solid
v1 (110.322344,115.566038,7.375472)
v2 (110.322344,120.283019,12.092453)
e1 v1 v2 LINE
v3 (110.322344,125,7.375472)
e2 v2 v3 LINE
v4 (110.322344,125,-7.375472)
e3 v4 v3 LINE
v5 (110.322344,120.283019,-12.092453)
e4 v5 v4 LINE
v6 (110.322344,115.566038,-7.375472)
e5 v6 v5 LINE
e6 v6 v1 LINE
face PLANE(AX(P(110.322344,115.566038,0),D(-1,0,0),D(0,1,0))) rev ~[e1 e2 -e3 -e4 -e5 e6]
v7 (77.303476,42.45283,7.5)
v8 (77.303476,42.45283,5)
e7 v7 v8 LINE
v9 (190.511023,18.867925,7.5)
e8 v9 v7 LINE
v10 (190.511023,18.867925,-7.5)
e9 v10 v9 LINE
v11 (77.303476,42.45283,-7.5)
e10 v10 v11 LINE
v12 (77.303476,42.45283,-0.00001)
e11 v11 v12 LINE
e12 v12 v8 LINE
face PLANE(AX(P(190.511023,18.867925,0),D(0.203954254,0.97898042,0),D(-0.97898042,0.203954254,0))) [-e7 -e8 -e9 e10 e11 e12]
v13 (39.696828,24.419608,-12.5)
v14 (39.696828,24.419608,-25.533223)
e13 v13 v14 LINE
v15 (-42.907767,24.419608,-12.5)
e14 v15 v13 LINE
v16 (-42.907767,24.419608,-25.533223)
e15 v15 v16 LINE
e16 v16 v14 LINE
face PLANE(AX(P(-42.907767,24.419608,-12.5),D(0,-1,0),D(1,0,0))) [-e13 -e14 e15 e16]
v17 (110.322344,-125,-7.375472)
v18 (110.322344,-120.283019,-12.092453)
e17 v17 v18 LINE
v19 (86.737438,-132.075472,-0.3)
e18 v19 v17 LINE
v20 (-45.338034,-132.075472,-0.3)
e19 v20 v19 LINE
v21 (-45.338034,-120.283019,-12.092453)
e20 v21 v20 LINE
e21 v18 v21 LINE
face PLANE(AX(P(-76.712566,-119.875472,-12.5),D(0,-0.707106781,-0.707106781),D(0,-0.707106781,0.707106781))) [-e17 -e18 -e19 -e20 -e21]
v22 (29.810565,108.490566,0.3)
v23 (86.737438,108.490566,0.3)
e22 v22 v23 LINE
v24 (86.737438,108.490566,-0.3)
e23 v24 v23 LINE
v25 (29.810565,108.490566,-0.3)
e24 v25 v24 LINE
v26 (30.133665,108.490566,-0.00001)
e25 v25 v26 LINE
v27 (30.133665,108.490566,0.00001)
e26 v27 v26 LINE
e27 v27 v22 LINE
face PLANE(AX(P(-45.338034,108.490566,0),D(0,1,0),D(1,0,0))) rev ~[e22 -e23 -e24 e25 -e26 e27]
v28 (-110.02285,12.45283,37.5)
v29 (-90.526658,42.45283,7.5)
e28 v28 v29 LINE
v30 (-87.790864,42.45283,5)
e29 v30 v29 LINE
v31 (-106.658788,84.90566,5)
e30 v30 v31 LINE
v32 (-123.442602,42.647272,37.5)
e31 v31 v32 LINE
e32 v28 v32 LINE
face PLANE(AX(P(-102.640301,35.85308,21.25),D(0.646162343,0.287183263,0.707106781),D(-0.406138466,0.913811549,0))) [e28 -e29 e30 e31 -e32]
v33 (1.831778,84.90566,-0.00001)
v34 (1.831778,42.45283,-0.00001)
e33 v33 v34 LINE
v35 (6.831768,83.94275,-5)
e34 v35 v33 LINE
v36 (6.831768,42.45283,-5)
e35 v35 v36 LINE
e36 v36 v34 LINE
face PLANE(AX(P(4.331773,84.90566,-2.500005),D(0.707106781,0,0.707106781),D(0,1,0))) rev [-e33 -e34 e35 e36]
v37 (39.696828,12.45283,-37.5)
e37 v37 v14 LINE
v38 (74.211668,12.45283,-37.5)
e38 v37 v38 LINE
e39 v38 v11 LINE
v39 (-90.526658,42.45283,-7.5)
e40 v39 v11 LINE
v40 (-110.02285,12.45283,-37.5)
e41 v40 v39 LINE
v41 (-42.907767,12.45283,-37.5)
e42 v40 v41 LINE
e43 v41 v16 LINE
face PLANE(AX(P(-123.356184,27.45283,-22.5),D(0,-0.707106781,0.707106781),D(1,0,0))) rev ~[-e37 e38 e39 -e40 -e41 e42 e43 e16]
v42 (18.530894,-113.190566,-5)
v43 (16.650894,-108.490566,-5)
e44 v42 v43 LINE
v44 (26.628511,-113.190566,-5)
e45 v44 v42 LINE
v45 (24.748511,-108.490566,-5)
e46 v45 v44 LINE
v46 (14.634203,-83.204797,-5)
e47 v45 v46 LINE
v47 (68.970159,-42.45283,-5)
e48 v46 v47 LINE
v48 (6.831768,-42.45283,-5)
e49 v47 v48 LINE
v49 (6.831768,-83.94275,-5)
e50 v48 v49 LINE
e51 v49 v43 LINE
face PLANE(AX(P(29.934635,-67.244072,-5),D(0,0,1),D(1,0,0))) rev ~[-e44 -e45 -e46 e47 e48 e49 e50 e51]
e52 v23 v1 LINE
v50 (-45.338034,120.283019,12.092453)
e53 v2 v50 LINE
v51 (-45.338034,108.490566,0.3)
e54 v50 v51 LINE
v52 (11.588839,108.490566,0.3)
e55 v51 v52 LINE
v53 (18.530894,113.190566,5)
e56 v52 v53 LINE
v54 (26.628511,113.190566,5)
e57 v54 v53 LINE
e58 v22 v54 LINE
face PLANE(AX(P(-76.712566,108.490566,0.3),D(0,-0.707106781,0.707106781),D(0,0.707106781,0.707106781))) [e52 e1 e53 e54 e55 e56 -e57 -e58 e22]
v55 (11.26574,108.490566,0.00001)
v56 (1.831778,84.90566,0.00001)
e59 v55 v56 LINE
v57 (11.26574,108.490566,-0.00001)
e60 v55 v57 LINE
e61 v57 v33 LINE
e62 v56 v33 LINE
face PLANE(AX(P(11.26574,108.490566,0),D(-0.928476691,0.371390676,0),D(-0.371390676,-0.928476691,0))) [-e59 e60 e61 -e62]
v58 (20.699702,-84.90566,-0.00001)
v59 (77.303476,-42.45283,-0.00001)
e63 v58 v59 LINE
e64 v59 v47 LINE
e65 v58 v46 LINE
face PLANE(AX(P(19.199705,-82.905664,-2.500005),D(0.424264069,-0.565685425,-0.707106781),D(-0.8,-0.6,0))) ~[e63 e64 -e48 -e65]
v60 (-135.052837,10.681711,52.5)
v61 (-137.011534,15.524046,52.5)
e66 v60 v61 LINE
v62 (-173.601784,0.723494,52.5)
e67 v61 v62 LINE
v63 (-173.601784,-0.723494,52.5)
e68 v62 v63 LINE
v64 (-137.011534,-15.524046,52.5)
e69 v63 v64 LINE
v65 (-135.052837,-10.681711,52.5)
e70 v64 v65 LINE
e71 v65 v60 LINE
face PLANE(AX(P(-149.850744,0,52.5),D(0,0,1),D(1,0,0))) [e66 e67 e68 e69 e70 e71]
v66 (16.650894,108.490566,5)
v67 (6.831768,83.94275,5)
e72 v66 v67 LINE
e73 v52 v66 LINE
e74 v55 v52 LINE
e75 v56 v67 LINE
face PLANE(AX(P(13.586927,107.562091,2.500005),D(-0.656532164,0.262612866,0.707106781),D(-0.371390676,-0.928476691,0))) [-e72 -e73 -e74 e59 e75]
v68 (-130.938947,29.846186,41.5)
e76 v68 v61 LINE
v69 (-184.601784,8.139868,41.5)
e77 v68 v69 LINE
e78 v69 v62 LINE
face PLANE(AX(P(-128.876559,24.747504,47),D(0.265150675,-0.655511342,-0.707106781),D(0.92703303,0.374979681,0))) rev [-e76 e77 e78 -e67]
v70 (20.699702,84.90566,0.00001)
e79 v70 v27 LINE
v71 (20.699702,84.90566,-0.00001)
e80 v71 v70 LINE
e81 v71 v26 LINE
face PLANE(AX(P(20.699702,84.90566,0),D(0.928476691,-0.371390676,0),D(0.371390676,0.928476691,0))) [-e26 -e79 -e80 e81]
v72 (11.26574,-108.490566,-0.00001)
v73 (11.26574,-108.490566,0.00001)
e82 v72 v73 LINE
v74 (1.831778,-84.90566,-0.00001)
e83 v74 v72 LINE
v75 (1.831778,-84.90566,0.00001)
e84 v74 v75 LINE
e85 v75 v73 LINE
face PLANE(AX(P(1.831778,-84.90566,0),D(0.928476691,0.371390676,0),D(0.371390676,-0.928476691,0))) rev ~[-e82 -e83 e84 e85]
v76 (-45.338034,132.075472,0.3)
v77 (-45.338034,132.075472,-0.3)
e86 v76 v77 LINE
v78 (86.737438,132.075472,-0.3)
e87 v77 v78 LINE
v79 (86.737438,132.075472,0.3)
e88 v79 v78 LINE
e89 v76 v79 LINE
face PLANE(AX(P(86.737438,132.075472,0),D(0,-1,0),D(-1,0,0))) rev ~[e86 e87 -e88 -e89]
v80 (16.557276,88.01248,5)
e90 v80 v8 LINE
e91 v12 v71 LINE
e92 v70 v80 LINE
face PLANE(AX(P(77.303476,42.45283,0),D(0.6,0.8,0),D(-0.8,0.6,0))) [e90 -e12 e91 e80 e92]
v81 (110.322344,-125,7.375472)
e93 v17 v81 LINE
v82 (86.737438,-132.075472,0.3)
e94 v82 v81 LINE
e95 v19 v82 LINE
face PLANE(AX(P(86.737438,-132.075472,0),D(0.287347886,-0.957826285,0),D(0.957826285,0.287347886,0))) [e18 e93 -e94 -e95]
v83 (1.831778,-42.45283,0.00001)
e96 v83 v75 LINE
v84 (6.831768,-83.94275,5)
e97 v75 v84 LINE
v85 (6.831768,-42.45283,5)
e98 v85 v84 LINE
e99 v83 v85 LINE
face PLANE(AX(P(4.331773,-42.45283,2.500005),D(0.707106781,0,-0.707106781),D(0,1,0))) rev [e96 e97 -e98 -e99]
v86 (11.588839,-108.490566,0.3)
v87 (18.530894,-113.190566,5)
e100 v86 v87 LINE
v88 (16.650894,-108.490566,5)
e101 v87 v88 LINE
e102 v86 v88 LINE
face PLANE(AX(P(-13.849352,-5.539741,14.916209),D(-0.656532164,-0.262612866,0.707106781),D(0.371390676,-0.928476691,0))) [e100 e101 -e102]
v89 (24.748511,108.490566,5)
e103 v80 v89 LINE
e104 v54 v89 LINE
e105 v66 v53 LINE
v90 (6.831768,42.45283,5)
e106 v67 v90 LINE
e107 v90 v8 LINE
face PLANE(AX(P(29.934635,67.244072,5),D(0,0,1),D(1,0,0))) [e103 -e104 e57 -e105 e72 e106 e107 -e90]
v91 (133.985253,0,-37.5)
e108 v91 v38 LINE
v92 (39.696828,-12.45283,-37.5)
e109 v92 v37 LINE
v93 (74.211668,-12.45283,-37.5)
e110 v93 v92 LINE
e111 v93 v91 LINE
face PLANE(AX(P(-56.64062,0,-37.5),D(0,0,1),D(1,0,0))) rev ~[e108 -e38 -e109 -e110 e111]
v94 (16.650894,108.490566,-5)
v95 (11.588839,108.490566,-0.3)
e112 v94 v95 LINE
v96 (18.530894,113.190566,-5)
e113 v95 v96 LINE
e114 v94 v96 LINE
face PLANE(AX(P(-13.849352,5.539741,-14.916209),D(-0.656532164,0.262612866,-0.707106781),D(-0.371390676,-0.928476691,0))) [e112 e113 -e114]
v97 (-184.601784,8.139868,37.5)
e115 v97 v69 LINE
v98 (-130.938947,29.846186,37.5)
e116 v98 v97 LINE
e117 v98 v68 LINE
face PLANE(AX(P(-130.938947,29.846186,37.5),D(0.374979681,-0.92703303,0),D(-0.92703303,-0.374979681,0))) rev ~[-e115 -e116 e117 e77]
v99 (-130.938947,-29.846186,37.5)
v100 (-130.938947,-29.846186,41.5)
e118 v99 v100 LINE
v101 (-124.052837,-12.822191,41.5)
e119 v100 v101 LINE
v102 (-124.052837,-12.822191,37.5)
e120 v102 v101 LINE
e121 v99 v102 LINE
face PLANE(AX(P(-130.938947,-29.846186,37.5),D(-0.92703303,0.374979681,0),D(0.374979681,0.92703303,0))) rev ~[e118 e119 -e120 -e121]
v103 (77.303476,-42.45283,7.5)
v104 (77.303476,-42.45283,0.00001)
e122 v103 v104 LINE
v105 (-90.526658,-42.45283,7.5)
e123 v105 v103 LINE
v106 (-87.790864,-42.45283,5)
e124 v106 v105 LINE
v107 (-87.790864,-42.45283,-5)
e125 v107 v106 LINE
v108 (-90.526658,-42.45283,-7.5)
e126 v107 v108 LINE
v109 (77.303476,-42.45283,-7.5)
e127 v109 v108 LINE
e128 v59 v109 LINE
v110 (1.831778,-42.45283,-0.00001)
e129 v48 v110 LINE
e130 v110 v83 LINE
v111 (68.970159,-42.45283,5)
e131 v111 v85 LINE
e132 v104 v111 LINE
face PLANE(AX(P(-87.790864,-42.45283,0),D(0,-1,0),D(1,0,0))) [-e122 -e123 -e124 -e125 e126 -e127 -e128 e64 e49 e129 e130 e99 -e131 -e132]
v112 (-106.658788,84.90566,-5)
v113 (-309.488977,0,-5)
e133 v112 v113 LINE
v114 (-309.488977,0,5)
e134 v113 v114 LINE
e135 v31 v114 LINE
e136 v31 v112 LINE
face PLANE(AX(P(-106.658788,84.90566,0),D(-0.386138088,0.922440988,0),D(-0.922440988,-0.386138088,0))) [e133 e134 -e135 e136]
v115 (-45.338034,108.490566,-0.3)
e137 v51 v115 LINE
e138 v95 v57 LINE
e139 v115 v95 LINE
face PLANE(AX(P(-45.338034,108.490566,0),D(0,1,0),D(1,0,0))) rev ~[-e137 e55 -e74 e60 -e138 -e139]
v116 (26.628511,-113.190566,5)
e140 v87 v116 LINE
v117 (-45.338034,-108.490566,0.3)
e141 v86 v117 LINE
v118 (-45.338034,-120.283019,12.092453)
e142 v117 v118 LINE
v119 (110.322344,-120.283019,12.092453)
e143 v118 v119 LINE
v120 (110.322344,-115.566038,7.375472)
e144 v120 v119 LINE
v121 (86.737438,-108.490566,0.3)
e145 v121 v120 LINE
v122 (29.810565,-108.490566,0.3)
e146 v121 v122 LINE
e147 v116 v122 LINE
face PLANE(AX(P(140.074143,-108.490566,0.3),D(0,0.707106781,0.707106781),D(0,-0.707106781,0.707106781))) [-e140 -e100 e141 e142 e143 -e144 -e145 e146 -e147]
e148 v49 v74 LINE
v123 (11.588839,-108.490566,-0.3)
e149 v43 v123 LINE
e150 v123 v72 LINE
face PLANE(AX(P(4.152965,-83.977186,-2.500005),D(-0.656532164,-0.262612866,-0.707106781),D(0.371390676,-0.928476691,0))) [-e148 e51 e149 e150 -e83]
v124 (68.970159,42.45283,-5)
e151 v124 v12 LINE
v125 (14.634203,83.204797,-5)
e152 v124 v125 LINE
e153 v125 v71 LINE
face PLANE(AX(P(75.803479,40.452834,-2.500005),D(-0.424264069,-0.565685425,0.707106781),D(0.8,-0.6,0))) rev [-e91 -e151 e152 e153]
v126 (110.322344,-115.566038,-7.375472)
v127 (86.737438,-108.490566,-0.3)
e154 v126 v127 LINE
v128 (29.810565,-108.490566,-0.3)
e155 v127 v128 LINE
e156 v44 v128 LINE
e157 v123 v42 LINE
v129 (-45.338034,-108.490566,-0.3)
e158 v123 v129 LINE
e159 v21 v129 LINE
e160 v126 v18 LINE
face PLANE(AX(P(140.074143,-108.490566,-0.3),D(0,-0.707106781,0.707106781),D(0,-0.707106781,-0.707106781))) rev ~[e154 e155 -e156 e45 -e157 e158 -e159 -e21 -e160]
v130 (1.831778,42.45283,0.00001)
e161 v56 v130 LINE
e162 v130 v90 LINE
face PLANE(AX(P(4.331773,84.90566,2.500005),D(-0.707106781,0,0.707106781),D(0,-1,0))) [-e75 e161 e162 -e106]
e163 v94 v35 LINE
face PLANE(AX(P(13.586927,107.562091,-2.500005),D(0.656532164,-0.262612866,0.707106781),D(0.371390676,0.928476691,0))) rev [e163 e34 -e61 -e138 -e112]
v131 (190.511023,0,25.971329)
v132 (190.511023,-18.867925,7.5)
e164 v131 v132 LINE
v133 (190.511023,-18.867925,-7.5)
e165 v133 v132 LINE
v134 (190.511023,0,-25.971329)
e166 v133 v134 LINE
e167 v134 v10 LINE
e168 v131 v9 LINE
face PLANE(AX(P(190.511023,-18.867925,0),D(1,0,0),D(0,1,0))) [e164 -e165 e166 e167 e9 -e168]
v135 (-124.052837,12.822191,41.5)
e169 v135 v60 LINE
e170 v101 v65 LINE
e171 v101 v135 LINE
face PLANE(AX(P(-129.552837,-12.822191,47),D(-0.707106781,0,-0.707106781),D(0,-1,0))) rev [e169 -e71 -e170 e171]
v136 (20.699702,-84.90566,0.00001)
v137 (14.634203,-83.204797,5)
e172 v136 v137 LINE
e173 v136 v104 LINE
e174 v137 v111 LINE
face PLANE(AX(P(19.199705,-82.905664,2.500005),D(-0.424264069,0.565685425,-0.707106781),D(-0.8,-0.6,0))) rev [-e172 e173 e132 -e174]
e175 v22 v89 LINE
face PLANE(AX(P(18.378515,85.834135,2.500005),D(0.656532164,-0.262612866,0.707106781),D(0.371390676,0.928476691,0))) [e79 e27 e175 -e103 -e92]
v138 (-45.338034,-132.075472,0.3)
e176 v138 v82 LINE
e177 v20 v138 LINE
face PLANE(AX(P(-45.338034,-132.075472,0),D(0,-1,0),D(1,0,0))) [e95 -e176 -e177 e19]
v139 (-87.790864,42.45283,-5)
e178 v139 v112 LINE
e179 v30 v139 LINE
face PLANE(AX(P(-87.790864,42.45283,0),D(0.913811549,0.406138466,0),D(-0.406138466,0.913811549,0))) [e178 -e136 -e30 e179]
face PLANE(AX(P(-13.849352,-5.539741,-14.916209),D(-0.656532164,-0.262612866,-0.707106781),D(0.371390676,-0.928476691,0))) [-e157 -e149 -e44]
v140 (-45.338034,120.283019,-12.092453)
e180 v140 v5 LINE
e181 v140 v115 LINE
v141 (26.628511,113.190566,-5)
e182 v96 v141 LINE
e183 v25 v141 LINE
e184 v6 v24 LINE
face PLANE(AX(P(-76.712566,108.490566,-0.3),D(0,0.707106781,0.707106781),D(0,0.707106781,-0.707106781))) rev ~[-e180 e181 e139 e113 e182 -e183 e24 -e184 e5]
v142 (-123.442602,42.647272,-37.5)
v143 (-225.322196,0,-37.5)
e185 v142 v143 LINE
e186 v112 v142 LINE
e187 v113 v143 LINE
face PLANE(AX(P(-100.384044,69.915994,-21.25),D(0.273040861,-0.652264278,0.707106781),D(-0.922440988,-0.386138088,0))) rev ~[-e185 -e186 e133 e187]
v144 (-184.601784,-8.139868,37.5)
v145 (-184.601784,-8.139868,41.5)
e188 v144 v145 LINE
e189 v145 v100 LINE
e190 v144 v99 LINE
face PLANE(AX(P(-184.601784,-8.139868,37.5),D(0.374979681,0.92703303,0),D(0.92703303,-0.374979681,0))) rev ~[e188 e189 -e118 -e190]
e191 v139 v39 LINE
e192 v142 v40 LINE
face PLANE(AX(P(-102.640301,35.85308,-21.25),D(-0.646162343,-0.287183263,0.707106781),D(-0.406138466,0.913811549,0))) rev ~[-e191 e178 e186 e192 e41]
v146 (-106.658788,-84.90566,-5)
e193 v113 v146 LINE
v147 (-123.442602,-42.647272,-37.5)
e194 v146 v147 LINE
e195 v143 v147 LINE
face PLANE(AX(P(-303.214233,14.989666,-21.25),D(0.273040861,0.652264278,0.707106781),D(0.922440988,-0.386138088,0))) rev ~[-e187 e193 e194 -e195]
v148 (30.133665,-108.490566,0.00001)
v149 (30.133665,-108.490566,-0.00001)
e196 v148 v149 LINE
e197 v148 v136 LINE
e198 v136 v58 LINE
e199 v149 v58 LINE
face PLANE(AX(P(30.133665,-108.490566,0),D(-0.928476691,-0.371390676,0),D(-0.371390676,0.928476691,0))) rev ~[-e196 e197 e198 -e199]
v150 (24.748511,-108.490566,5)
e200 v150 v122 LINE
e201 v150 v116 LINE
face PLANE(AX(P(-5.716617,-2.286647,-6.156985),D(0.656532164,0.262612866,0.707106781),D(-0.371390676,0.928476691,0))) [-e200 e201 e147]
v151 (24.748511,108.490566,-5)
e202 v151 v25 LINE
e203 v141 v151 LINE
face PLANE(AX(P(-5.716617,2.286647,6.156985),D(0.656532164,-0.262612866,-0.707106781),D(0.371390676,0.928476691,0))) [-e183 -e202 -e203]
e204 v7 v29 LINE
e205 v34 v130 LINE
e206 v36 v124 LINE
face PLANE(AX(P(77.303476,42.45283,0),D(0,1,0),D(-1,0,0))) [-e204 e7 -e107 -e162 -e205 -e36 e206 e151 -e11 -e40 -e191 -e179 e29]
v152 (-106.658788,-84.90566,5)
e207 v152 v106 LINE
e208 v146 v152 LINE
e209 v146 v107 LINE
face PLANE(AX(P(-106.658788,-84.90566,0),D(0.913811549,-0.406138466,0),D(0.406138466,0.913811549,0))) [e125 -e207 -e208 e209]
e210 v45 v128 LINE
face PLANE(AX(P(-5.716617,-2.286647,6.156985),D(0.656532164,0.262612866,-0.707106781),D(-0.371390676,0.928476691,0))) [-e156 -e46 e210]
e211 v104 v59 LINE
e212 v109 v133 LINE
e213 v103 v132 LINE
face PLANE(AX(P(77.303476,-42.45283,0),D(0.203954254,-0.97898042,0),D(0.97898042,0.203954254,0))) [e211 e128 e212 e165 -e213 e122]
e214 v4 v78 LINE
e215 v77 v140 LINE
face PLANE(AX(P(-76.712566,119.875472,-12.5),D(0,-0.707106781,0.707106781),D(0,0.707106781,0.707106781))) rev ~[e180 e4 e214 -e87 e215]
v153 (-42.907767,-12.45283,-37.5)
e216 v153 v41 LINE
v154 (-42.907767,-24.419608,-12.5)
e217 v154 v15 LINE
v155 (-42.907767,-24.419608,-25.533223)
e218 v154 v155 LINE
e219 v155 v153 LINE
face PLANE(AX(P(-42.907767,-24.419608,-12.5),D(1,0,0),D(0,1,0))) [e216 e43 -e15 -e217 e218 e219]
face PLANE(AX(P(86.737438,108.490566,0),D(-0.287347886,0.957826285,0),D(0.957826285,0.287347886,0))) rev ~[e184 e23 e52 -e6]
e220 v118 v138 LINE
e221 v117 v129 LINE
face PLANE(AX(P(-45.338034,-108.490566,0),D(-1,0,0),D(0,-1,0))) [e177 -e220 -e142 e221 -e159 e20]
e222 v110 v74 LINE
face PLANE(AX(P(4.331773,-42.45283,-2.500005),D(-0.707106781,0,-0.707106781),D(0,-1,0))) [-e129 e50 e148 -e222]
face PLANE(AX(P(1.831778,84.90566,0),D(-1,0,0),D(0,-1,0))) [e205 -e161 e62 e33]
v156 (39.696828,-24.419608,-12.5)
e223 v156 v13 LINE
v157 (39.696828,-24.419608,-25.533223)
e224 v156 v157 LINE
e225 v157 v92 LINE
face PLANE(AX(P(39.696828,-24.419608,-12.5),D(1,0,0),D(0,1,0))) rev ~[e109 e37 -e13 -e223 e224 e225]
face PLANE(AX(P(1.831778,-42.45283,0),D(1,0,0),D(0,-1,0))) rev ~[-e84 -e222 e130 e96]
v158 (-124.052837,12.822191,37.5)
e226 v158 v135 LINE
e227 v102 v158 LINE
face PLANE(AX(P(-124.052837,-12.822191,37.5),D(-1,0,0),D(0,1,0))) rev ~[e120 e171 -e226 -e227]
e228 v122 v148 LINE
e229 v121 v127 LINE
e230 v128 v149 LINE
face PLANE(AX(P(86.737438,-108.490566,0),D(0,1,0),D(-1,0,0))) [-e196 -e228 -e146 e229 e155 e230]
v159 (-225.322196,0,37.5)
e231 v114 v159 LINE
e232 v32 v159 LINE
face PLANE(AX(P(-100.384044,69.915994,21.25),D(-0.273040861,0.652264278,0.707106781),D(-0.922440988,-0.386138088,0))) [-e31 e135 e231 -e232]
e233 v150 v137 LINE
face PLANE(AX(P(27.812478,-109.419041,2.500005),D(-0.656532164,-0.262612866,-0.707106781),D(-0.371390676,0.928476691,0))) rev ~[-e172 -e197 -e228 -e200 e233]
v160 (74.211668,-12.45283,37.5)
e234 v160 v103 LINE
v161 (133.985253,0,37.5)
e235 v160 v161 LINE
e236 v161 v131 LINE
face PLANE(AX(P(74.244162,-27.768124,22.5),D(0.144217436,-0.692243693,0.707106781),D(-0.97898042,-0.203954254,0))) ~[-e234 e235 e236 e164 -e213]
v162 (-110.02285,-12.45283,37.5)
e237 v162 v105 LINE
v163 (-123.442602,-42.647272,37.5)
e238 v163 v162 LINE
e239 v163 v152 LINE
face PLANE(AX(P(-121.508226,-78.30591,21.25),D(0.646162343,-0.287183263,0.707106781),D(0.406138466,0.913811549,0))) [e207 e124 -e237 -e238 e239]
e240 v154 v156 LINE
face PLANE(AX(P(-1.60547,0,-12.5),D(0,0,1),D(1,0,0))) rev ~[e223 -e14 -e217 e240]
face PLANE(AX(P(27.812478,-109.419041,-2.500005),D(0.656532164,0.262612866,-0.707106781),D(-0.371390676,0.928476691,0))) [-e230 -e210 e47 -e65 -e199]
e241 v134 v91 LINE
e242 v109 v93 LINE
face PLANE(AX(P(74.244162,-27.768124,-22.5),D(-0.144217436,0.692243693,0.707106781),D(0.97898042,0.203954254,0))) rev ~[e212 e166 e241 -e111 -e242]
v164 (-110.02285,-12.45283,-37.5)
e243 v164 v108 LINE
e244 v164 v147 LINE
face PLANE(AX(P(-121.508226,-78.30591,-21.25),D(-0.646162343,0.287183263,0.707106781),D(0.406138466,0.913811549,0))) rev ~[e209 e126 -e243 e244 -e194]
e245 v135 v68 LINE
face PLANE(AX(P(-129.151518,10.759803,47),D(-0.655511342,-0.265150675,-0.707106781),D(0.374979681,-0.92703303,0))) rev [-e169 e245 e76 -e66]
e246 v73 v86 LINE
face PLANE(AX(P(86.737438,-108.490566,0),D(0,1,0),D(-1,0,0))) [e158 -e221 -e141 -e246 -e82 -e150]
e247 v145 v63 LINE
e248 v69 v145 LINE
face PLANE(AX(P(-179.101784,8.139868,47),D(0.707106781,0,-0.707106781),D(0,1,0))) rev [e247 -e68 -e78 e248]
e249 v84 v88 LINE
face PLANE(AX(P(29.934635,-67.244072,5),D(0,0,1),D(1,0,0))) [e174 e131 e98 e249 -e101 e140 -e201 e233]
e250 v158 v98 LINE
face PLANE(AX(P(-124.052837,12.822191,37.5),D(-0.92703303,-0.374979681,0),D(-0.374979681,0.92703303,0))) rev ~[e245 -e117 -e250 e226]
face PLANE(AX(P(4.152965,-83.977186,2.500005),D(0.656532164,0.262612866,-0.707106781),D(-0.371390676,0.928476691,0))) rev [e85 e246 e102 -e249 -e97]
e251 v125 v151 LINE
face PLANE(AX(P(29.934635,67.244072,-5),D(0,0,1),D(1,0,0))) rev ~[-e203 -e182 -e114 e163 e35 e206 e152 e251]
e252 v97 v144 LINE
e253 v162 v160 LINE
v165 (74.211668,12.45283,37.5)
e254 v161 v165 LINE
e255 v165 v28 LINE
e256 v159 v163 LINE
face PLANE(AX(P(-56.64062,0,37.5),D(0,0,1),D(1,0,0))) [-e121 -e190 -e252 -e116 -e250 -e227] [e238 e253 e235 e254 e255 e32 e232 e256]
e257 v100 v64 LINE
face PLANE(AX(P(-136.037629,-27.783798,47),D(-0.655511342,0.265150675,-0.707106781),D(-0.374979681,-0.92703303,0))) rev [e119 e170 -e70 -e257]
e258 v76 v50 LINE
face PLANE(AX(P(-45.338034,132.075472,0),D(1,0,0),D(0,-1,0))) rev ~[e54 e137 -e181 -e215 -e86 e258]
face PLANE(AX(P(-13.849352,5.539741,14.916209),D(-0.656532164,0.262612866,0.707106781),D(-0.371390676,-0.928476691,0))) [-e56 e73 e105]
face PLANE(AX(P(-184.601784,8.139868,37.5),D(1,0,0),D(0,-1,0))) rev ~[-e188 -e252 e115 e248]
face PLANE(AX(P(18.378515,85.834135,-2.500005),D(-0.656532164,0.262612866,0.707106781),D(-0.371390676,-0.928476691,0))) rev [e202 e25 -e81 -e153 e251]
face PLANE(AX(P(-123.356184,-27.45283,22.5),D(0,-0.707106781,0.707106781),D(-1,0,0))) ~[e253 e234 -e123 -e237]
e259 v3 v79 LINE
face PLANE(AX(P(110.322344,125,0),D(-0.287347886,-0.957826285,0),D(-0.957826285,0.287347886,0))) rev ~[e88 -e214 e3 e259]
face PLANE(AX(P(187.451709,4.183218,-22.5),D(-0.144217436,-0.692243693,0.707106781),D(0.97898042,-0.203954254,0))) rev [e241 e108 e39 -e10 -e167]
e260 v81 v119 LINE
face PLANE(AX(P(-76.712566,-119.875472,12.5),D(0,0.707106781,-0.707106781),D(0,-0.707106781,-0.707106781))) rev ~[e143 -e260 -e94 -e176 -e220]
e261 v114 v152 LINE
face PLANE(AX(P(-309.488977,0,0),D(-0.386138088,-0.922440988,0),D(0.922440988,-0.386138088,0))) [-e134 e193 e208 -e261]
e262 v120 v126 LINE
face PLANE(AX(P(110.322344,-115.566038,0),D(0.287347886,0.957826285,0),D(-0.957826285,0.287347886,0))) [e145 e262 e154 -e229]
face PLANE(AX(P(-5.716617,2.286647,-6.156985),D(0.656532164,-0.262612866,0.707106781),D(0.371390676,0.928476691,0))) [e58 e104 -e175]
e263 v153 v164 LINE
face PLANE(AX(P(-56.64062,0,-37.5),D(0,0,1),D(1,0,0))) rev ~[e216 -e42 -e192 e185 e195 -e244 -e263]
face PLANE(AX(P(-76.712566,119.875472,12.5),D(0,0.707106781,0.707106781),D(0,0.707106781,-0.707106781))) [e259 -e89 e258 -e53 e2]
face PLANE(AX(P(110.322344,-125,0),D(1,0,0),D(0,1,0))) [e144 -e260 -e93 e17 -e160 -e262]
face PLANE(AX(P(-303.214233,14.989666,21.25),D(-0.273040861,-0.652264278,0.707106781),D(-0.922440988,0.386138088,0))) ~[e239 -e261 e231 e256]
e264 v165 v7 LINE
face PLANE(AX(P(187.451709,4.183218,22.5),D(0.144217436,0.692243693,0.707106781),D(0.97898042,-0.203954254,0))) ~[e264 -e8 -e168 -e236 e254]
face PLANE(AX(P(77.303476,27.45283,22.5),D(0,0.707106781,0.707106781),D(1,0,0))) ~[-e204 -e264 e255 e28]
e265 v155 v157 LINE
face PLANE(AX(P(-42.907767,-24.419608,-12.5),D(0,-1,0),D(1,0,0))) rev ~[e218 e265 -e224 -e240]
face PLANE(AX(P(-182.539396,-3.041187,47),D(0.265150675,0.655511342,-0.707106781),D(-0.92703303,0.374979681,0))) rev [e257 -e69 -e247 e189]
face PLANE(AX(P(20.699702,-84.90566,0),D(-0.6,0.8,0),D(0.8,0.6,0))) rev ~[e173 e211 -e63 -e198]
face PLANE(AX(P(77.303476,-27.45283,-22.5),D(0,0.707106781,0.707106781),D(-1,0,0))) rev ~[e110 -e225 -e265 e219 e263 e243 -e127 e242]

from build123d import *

# Parameters (mm, degrees)
F1_DEPTH      = 37.5
F2_SIZE       = 32.5
F3_DEPTH      = 5
F4_DEPTH      = 12.5
F5_SIZE       = 30
F6_SIZE       = 4.99999
F7_T1_DEPTH   = 216.7867093217
F7_T6_DEPTH   = 216.7867093217
F7_T12_DEPTH  = 216.7867093217
F7_T19_DEPTH  = 216.7867093217
F7_T25_DEPTH  = 216.7867093217
F7_T32_DEPTH  = 216.7867093217
F7_T38_DEPTH  = 216.7867093217
F7_T45_DEPTH  = 216.7867093217
F7_T51_DEPTH  = 216.7867093217
F7_T58_DEPTH  = 216.7867093217
F7_T64_DEPTH  = 216.7867093217
F7_T71_DEPTH  = 216.7867093217
F7_T77_DEPTH  = 216.7867093217
F7_T84_DEPTH  = 216.7867093217
F7_T90_DEPTH  = 216.7867093217
F7_T97_DEPTH  = 216.7867093217
F7_T103_DEPTH = 216.7867093217
F7_T110_DEPTH = 216.7867093217
F7_T116_DEPTH = 216.7867093217
F7_T123_DEPTH = 216.7867093217
F7_T129_DEPTH = 216.7867093217
F7_T136_DEPTH = 216.7867093217
F7_T142_DEPTH = 216.7867093217
F7_T149_DEPTH = 216.7867093217
F7_T155_DEPTH = 216.7867093217
F10_DEPTH     = 15
F11_SIZE      = 11
F13_W         = 82.6045945287
F13_H         = 48.8392151892
F14_DEPTH     = 25


# Not quite as in the source:
# - a fillet or chamfer that OpenCascade refuses, or shapes differently, is made with other operations: its cross-section is extruded or revolved along the edge and cut away or added
# - a fillet or chamfer is up to 0.001 mm smaller than in the source, because OpenCascade refuses the exact size
# - a feature names something its author has since deleted; it is built from what else it names


with BuildPart() as f1:
    # F0 (on Top) → F1 (new body, symmetric)
    with BuildSketch(Plane.XY):
        Polygon((-106.6587882222, 84.9056603774), (-309.4889769014, 0), (-106.6587882222, -84.9056603774), (-87.7908636939, -42.4528301887), (1.8317778155, -42.4528301887), (77.3034759288, -42.4528301887), (190.5110230986, -18.8679245283), (190.5110230986, 18.8679245283), (77.3034759288, 42.4528301887), (1.8317778155, 42.4528301887), (-87.7908636939, 42.4528301887), align=None)
    extrude(amount=F1_DEPTH, both=True)

    # F2
    f2_edges = [f1.edges().sort_by_distance(p)[0] for p in [
        (-208.073883, 42.45283, -37.5),
        (-208.073883, 42.45283, 37.5),
        (-208.073883, -42.45283, 37.5),
        (-208.073883, -42.45283, -37.5),
        (-97.224826, -63.679245, 37.5),
        (-97.224826, -63.679245, -37.5),
        (-97.224826, 63.679245, 37.5),
        (-97.224826, 63.679245, -37.5),
    ]]
    chamfer(f2_edges, length=F2_SIZE)

    # F0 (on Top) → F3 (join, symmetric)
    with BuildSketch(Plane.XY):
        Polygon((77.3034759288, -42.4528301887), (1.8317778155, -42.4528301887), (1.8317778155, -84.9056603774), (11.2657400797, -108.4905660377), (30.133664608, -108.4905660377), (20.6997023439, -84.9056603774), align=None)
        Polygon((1.8317778155, 84.9056603774), (1.8317778155, 42.4528301887), (77.3034759288, 42.4528301887), (20.6997023439, 84.9056603774), (30.133664608, 108.4905660377), (11.2657400797, 108.4905660377), align=None)
    extrude(amount=F3_DEPTH, both=True)

    # F0 (on Top) → F4 (join, symmetric)
    with BuildSketch(Plane.XY):
        Polygon((-45.3380335052, 108.4905660377), (11.2657400797, 108.4905660377), (30.133664608, 108.4905660377), (86.7374381929, 108.4905660377), (110.3223438533, 115.5660377358), (110.3223438533, 125), (86.7374381929, 132.0754716981), (-45.3380335052, 132.0754716981), align=None)
        Polygon((30.133664608, -108.4905660377), (11.2657400797, -108.4905660377), (-45.3380335052, -108.4905660377), (-45.3380335052, -132.0754716981), (86.7374381929, -132.0754716981), (110.3223438533, -125), (110.3223438533, -115.5660377358), (86.7374381929, -108.4905660377), align=None)
    extrude(amount=F4_DEPTH, both=True)

    # F5 (call 1 of 4: OpenCascade refuses the feature's edges together)
    f5_edges = [f1.edges().sort_by_distance(p)[0] for p in [
        (133.90725, 30.660377, -37.5),
        (-23.026354, 42.45283, -37.5),
    ]]
    chamfer(f5_edges, length=F5_SIZE)

    # F5#2 (call 2 of 4)
    f5_2_edges = [f1.edges().sort_by_distance(p)[0] for p in [
        (133.90725, 30.660377, 37.5),
        (-23.026354, 42.45283, 37.5),
    ]]
    chamfer(f5_2_edges, length=F5_SIZE)

    # F5#3 (call 3 of 4)
    f5_3_edges = [f1.edges().sort_by_distance(p)[0] for p in [
        (133.90725, -30.660377, 37.5),
        (-23.026354, -42.45283, 37.5),
    ]]
    chamfer(f5_3_edges, length=F5_SIZE)

    # F5#4 (call 4 of 4)
    f5_4_edges = [f1.edges().sort_by_distance(p)[0] for p in [
        (133.90725, -30.660377, -37.5),
        (-23.026354, -42.45283, -37.5),
    ]]
    chamfer(f5_4_edges, length=F5_SIZE)

    # F6 (size 5 in the source; OpenCascade refuses exactly that, so slightly less here)
    f6_edges = [f1.edges().sort_by_distance(p)[0] for p in [
        (1.831778, 63.679245, 5),
        (1.831778, 63.679245, -5),
        (49.001589, 63.679245, -5),
        (6.548759, 96.698113, 5),
        (6.548759, 96.698113, -5),
        (25.416683, 96.698113, -5),
        (25.416683, 96.698113, 5),
        (49.001589, -63.679245, -5),
        (1.831778, -63.679245, -5),
        (6.548759, -96.698113, -5),
        (25.416683, -96.698113, -5),
        (1.831778, -63.679245, 5),
        (6.548759, -96.698113, 5),
        (49.001589, -63.679245, 5),
        (25.416683, -96.698113, 5),
    ]]
    chamfer(f6_edges, length=F6_SIZE)

    # F7: chamfer of 12.2 on 8 edges, made by hand

    # F7_s2 → F7_t1 (cut)
    with BuildSketch(Plane.YZ.offset(-76.7125659584)):
        Polygon((-119.8754716981, 12.5), (-132.0754716981, 0.3), (-132.0754716981, 12.5), align=None)
        Polygon((-119.8754716981, -12.5), (-132.0754716981, -0.3), (-132.0754716981, -12.5), align=None)
        Polygon((119.8754716981, -12.5), (132.0754716981, -0.3), (132.0754716981, -12.5), align=None)
        Polygon((119.8754716981, 12.5), (132.0754716981, 0.3), (132.0754716981, 12.5), align=None)
    extrude(amount=F7_T1_DEPTH, mode=Mode.SUBTRACT)


with BuildPart() as f7_tool4:
    # F7_s5 → F7_t6 (new body)
    with BuildSketch(Plane.YZ.offset(140.0741433633)):
        Polygon((-108.4905660377, 0.3), (-120.6905660377, 12.5), (-108.4905660377, 12.5), align=None)
    extrude(amount=-F7_T6_DEPTH)

    split(bisect_by=Plane.XY.offset(5), keep=Keep.BOTTOM)

    split(bisect_by=Plane(origin=(-5.7166168262, -2.2866467305, -6.1569847497), x_dir=(-0.3713906764, 0.9284766909, 0), z_dir=(0.6565321643, 0.2626128657, 0.7071067812)), keep=Keep.TOP)


with BuildPart() as f1_1:
    add(f1.part)

    # F7_t3: cut F7_tool4
    add(f7_tool4.part, mode=Mode.SUBTRACT)


with BuildPart() as f7_tool10:
    # F7_s11 → F7_t12 (new body)
    with BuildSketch(Plane.YZ.offset(140.0741433633)):
        Polygon((-108.4905660377, 0.3), (-120.6905660377, 12.5), (-108.4905660377, 12.5), align=None)
    extrude(amount=-F7_T12_DEPTH)

    split(bisect_by=Plane.XY.offset(5), keep=Keep.TOP)

    split(bisect_by=Plane(origin=(-5.7166168262, -2.2866467305, -6.1569847497), x_dir=(-0.3713906764, 0.9284766909, 0), z_dir=(0.6565321643, 0.2626128657, 0.7071067812)), keep=Keep.TOP)

    split(bisect_by=Plane(origin=(-13.8493522007, -5.5397408803, 14.9162088146), x_dir=(-0.3713906764, 0.9284766909, 0), z_dir=(0.6565321643, 0.2626128657, -0.7071067812)), keep=Keep.TOP)


with BuildPart() as f1_2:
    add(f1_1.part)

    # F7_t9: cut F7_tool10
    add(f7_tool10.part, mode=Mode.SUBTRACT)


with BuildPart() as f7_tool17:
    # F7_s18 → F7_t19 (new body)
    with BuildSketch(Plane.YZ.offset(140.0741433633)):
        Polygon((-108.4905660377, 0.3), (-120.6905660377, 12.5), (-108.4905660377, 12.5), align=None)
    extrude(amount=-F7_T19_DEPTH)

    split(bisect_by=Plane(origin=(-5.7166168262, -2.2866467305, -6.1569847497), x_dir=(-0.3713906764, 0.9284766909, 0), z_dir=(0.6565321643, 0.2626128657, 0.7071067812)), keep=Keep.TOP)

    split(bisect_by=Plane(origin=(-13.8493522007, -5.5397408803, 14.9162088146), x_dir=(0.3713906764, -0.9284766909, 0), z_dir=(-0.6565321643, -0.2626128657, 0.7071067812)), keep=Keep.TOP)


with BuildPart() as f1_3:
    add(f1_2.part)

    # F7_t16: cut F7_tool17
    add(f7_tool17.part, mode=Mode.SUBTRACT)


with BuildPart() as f7_tool23:
    # F7_s24 → F7_t25 (new body)
    with BuildSketch(Plane.YZ.offset(140.0741433633)):
        Polygon((-108.4905660377, 0.3), (-120.6905660377, 12.5), (-108.4905660377, 12.5), align=None)
    extrude(amount=-F7_T25_DEPTH)

    split(bisect_by=Plane.XY.offset(5), keep=Keep.TOP)

    split(bisect_by=Plane(origin=(-5.7166168262, -2.2866467305, -6.1569847497), x_dir=(0.3713906764, -0.9284766909, 0), z_dir=(-0.6565321643, -0.2626128657, -0.7071067812)), keep=Keep.TOP)

    split(bisect_by=Plane(origin=(-13.8493522007, -5.5397408803, 14.9162088146), x_dir=(-0.3713906764, 0.9284766909, 0), z_dir=(0.6565321643, 0.2626128657, -0.7071067812)), keep=Keep.TOP)


with BuildPart() as f1_4:
    add(f1_3.part)

    # F7_t22: cut F7_tool23
    add(f7_tool23.part, mode=Mode.SUBTRACT)


with BuildPart() as f7_tool30:
    # F7_s31 → F7_t32 (new body)
    with BuildSketch(Plane.YZ.offset(140.0741433633)):
        Polygon((-108.4905660377, 0.3), (-120.6905660377, 12.5), (-108.4905660377, 12.5), align=None)
    extrude(amount=-F7_T32_DEPTH)

    split(bisect_by=Plane.XY.offset(5), keep=Keep.BOTTOM)

    split(bisect_by=Plane(origin=(-13.8493522007, -5.5397408803, 14.9162088146), x_dir=(0.3713906764, -0.9284766909, 0), z_dir=(-0.6565321643, -0.2626128657, 0.7071067812)), keep=Keep.TOP)


with BuildPart() as f1_5:
    add(f1_4.part)

    # F7_t29: cut F7_tool30
    add(f7_tool30.part, mode=Mode.SUBTRACT)


with BuildPart() as f7_tool36:
    # F7_s37 → F7_t38 (new body)
    with BuildSketch(Plane.YZ.offset(140.0741433633)):
        Polygon((-108.4905660377, 0.3), (-120.6905660377, 12.5), (-108.4905660377, 12.5), align=None)
    extrude(amount=-F7_T38_DEPTH)

    split(bisect_by=Plane.XY.offset(5), keep=Keep.TOP)

    split(bisect_by=Plane(origin=(-5.7166168262, -2.2866467305, -6.1569847497), x_dir=(0.3713906764, -0.9284766909, 0), z_dir=(-0.6565321643, -0.2626128657, -0.7071067812)), keep=Keep.TOP)

    split(bisect_by=Plane(origin=(-13.8493522007, -5.5397408803, 14.9162088146), x_dir=(0.3713906764, -0.9284766909, 0), z_dir=(-0.6565321643, -0.2626128657, 0.7071067812)), keep=Keep.TOP)


with BuildPart() as f1_6:
    add(f1_5.part)

    # F7_t35: cut F7_tool36
    add(f7_tool36.part, mode=Mode.SUBTRACT)


with BuildPart() as f7_tool43:
    # F7_s44 → F7_t45 (new body)
    with BuildSketch(Plane.YZ.offset(140.0741433633)):
        Polygon((-108.4905660377, -0.3), (-120.6905660377, -12.5), (-108.4905660377, -12.5), align=None)
    extrude(amount=-F7_T45_DEPTH)

    split(bisect_by=Plane.XY.offset(-5), keep=Keep.TOP)

    split(bisect_by=Plane(origin=(-5.7166168262, -2.2866467305, 6.1569847497), x_dir=(-0.3713906764, 0.9284766909, 0), z_dir=(0.6565321643, 0.2626128657, -0.7071067812)), keep=Keep.TOP)


with BuildPart() as f1_7:
    add(f1_6.part)

    # F7_t42: cut F7_tool43
    add(f7_tool43.part, mode=Mode.SUBTRACT)


with BuildPart() as f7_tool49:
    # F7_s50 → F7_t51 (new body)
    with BuildSketch(Plane.YZ.offset(140.0741433633)):
        Polygon((-108.4905660377, -0.3), (-120.6905660377, -12.5), (-108.4905660377, -12.5), align=None)
    extrude(amount=-F7_T51_DEPTH)

    split(bisect_by=Plane.XY.offset(-5), keep=Keep.BOTTOM)

    split(bisect_by=Plane(origin=(-5.7166168262, -2.2866467305, 6.1569847497), x_dir=(-0.3713906764, 0.9284766909, 0), z_dir=(0.6565321643, 0.2626128657, -0.7071067812)), keep=Keep.TOP)

    split(bisect_by=Plane(origin=(-13.8493522007, -5.5397408803, -14.9162088146), x_dir=(-0.3713906764, 0.9284766909, 0), z_dir=(0.6565321643, 0.2626128657, 0.7071067812)), keep=Keep.TOP)


with BuildPart() as f1_8:
    add(f1_7.part)

    # F7_t48: cut F7_tool49
    add(f7_tool49.part, mode=Mode.SUBTRACT)


with BuildPart() as f7_tool56:
    # F7_s57 → F7_t58 (new body)
    with BuildSketch(Plane.YZ.offset(140.0741433633)):
        Polygon((-108.4905660377, -0.3), (-120.6905660377, -12.5), (-108.4905660377, -12.5), align=None)
    extrude(amount=-F7_T58_DEPTH)

    split(bisect_by=Plane(origin=(-5.7166168262, -2.2866467305, 6.1569847497), x_dir=(-0.3713906764, 0.9284766909, 0), z_dir=(0.6565321643, 0.2626128657, -0.7071067812)), keep=Keep.TOP)

    split(bisect_by=Plane(origin=(-13.8493522007, -5.5397408803, -14.9162088146), x_dir=(0.3713906764, -0.9284766909, 0), z_dir=(-0.6565321643, -0.2626128657, -0.7071067812)), keep=Keep.TOP)


with BuildPart() as f1_9:
    add(f1_8.part)

    # F7_t55: cut F7_tool56
    add(f7_tool56.part, mode=Mode.SUBTRACT)


with BuildPart() as f7_tool62:
    # F7_s63 → F7_t64 (new body)
    with BuildSketch(Plane.YZ.offset(140.0741433633)):
        Polygon((-108.4905660377, -0.3), (-120.6905660377, -12.5), (-108.4905660377, -12.5), align=None)
    extrude(amount=-F7_T64_DEPTH)

    split(bisect_by=Plane.XY.offset(-5), keep=Keep.BOTTOM)

    split(bisect_by=Plane(origin=(-5.7166168262, -2.2866467305, 6.1569847497), x_dir=(0.3713906764, -0.9284766909, 0), z_dir=(-0.6565321643, -0.2626128657, 0.7071067812)), keep=Keep.TOP)

    split(bisect_by=Plane(origin=(-13.8493522007, -5.5397408803, -14.9162088146), x_dir=(-0.3713906764, 0.9284766909, 0), z_dir=(0.6565321643, 0.2626128657, 0.7071067812)), keep=Keep.TOP)


with BuildPart() as f1_10:
    add(f1_9.part)

    # F7_t61: cut F7_tool62
    add(f7_tool62.part, mode=Mode.SUBTRACT)


with BuildPart() as f7_tool69:
    # F7_s70 → F7_t71 (new body)
    with BuildSketch(Plane.YZ.offset(140.0741433633)):
        Polygon((-108.4905660377, -0.3), (-120.6905660377, -12.5), (-108.4905660377, -12.5), align=None)
    extrude(amount=-F7_T71_DEPTH)

    split(bisect_by=Plane.XY.offset(-5), keep=Keep.TOP)

    split(bisect_by=Plane(origin=(-13.8493522007, -5.5397408803, -14.9162088146), x_dir=(0.3713906764, -0.9284766909, 0), z_dir=(-0.6565321643, -0.2626128657, -0.7071067812)), keep=Keep.TOP)


with BuildPart() as f1_11:
    add(f1_10.part)

    # F7_t68: cut F7_tool69
    add(f7_tool69.part, mode=Mode.SUBTRACT)


with BuildPart() as f7_tool75:
    # F7_s76 → F7_t77 (new body)
    with BuildSketch(Plane.YZ.offset(140.0741433633)):
        Polygon((-108.4905660377, -0.3), (-120.6905660377, -12.5), (-108.4905660377, -12.5), align=None)
    extrude(amount=-F7_T77_DEPTH)

    split(bisect_by=Plane.XY.offset(-5), keep=Keep.BOTTOM)

    split(bisect_by=Plane(origin=(-5.7166168262, -2.2866467305, 6.1569847497), x_dir=(0.3713906764, -0.9284766909, 0), z_dir=(-0.6565321643, -0.2626128657, 0.7071067812)), keep=Keep.TOP)

    split(bisect_by=Plane(origin=(-13.8493522007, -5.5397408803, -14.9162088146), x_dir=(0.3713906764, -0.9284766909, 0), z_dir=(-0.6565321643, -0.2626128657, -0.7071067812)), keep=Keep.TOP)


with BuildPart() as f1_12:
    add(f1_11.part)

    # F7_t74: cut F7_tool75
    add(f7_tool75.part, mode=Mode.SUBTRACT)


with BuildPart() as f7_tool82:
    # F7_s83 → F7_t84 (new body)
    with BuildSketch(Plane.YZ.offset(-76.7125659584)):
        Polygon((108.4905660377, 0.3), (120.6905660377, 12.5), (108.4905660377, 12.5), align=None)
    extrude(amount=F7_T84_DEPTH)

    split(bisect_by=Plane.XY.offset(5), keep=Keep.BOTTOM)

    split(bisect_by=Plane(origin=(-13.8493522007, 5.5397408803, 14.9162088146), x_dir=(-0.3713906764, -0.9284766909, 0), z_dir=(-0.6565321643, 0.2626128657, 0.7071067812)), keep=Keep.TOP)


with BuildPart() as f1_13:
    add(f1_12.part)

    # F7_t81: cut F7_tool82
    add(f7_tool82.part, mode=Mode.SUBTRACT)


with BuildPart() as f7_tool88:
    # F7_s89 → F7_t90 (new body)
    with BuildSketch(Plane.YZ.offset(-76.7125659584)):
        Polygon((108.4905660377, 0.3), (120.6905660377, 12.5), (108.4905660377, 12.5), align=None)
    extrude(amount=F7_T90_DEPTH)

    split(bisect_by=Plane.XY.offset(5), keep=Keep.TOP)

    split(bisect_by=Plane(origin=(-5.7166168262, 2.2866467305, -6.1569847497), x_dir=(-0.3713906764, -0.9284766909, 0), z_dir=(-0.6565321643, 0.2626128657, -0.7071067812)), keep=Keep.TOP)

    split(bisect_by=Plane(origin=(-13.8493522007, 5.5397408803, 14.9162088146), x_dir=(-0.3713906764, -0.9284766909, 0), z_dir=(-0.6565321643, 0.2626128657, 0.7071067812)), keep=Keep.TOP)


with BuildPart() as f1_14:
    add(f1_13.part)

    # F7_t87: cut F7_tool88
    add(f7_tool88.part, mode=Mode.SUBTRACT)


with BuildPart() as f7_tool95:
    # F7_s96 → F7_t97 (new body)
    with BuildSketch(Plane.YZ.offset(-76.7125659584)):
        Polygon((108.4905660377, 0.3), (120.6905660377, 12.5), (108.4905660377, 12.5), align=None)
    extrude(amount=F7_T97_DEPTH)

    split(bisect_by=Plane(origin=(-5.7166168262, 2.2866467305, -6.1569847497), x_dir=(0.3713906764, 0.9284766909, 0), z_dir=(0.6565321643, -0.2626128657, 0.7071067812)), keep=Keep.TOP)

    split(bisect_by=Plane(origin=(-13.8493522007, 5.5397408803, 14.9162088146), x_dir=(-0.3713906764, -0.9284766909, 0), z_dir=(-0.6565321643, 0.2626128657, 0.7071067812)), keep=Keep.TOP)


with BuildPart() as f1_15:
    add(f1_14.part)

    # F7_t94: cut F7_tool95
    add(f7_tool95.part, mode=Mode.SUBTRACT)


with BuildPart() as f7_tool101:
    # F7_s102 → F7_t103 (new body)
    with BuildSketch(Plane.YZ.offset(-76.7125659584)):
        Polygon((108.4905660377, 0.3), (120.6905660377, 12.5), (108.4905660377, 12.5), align=None)
    extrude(amount=F7_T103_DEPTH)

    split(bisect_by=Plane.XY.offset(5), keep=Keep.TOP)

    split(bisect_by=Plane(origin=(-5.7166168262, 2.2866467305, -6.1569847497), x_dir=(-0.3713906764, -0.9284766909, 0), z_dir=(-0.6565321643, 0.2626128657, -0.7071067812)), keep=Keep.TOP)

    split(bisect_by=Plane(origin=(-13.8493522007, 5.5397408803, 14.9162088146), x_dir=(0.3713906764, 0.9284766909, 0), z_dir=(0.6565321643, -0.2626128657, -0.7071067812)), keep=Keep.TOP)


with BuildPart() as f1_16:
    add(f1_15.part)

    # F7_t100: cut F7_tool101
    add(f7_tool101.part, mode=Mode.SUBTRACT)


with BuildPart() as f7_tool108:
    # F7_s109 → F7_t110 (new body)
    with BuildSketch(Plane.YZ.offset(-76.7125659584)):
        Polygon((108.4905660377, 0.3), (120.6905660377, 12.5), (108.4905660377, 12.5), align=None)
    extrude(amount=F7_T110_DEPTH)

    split(bisect_by=Plane.XY.offset(5), keep=Keep.BOTTOM)

    split(bisect_by=Plane(origin=(-5.7166168262, 2.2866467305, -6.1569847497), x_dir=(0.3713906764, 0.9284766909, 0), z_dir=(0.6565321643, -0.2626128657, 0.7071067812)), keep=Keep.TOP)


with BuildPart() as f1_17:
    add(f1_16.part)

    # F7_t107: cut F7_tool108
    add(f7_tool108.part, mode=Mode.SUBTRACT)


with BuildPart() as f7_tool114:
    # F7_s115 → F7_t116 (new body)
    with BuildSketch(Plane.YZ.offset(-76.7125659584)):
        Polygon((108.4905660377, 0.3), (120.6905660377, 12.5), (108.4905660377, 12.5), align=None)
    extrude(amount=F7_T116_DEPTH)

    split(bisect_by=Plane.XY.offset(5), keep=Keep.TOP)

    split(bisect_by=Plane(origin=(-5.7166168262, 2.2866467305, -6.1569847497), x_dir=(0.3713906764, 0.9284766909, 0), z_dir=(0.6565321643, -0.2626128657, 0.7071067812)), keep=Keep.TOP)

    split(bisect_by=Plane(origin=(-13.8493522007, 5.5397408803, 14.9162088146), x_dir=(0.3713906764, 0.9284766909, 0), z_dir=(0.6565321643, -0.2626128657, -0.7071067812)), keep=Keep.TOP)


with BuildPart() as f1_18:
    add(f1_17.part)

    # F7_t113: cut F7_tool114
    add(f7_tool114.part, mode=Mode.SUBTRACT)


with BuildPart() as f7_tool121:
    # F7_s122 → F7_t123 (new body)
    with BuildSketch(Plane.YZ.offset(-76.7125659584)):
        Polygon((108.4905660377, -0.3), (120.6905660377, -12.5), (108.4905660377, -12.5), align=None)
    extrude(amount=F7_T123_DEPTH)

    split(bisect_by=Plane.XY.offset(-5), keep=Keep.TOP)

    split(bisect_by=Plane(origin=(-13.8493522007, 5.5397408803, -14.9162088146), x_dir=(-0.3713906764, -0.9284766909, 0), z_dir=(-0.6565321643, 0.2626128657, -0.7071067812)), keep=Keep.TOP)


with BuildPart() as f1_19:
    add(f1_18.part)

    # F7_t120: cut F7_tool121
    add(f7_tool121.part, mode=Mode.SUBTRACT)


with BuildPart() as f7_tool127:
    # F7_s128 → F7_t129 (new body)
    with BuildSketch(Plane.YZ.offset(-76.7125659584)):
        Polygon((108.4905660377, -0.3), (120.6905660377, -12.5), (108.4905660377, -12.5), align=None)
    extrude(amount=F7_T129_DEPTH)

    split(bisect_by=Plane.XY.offset(-5), keep=Keep.BOTTOM)

    split(bisect_by=Plane(origin=(-5.7166168262, 2.2866467305, 6.1569847497), x_dir=(-0.3713906764, -0.9284766909, 0), z_dir=(-0.6565321643, 0.2626128657, 0.7071067812)), keep=Keep.TOP)

    split(bisect_by=Plane(origin=(-13.8493522007, 5.5397408803, -14.9162088146), x_dir=(-0.3713906764, -0.9284766909, 0), z_dir=(-0.6565321643, 0.2626128657, -0.7071067812)), keep=Keep.TOP)


with BuildPart() as f1_20:
    add(f1_19.part)

    # F7_t126: cut F7_tool127
    add(f7_tool127.part, mode=Mode.SUBTRACT)


with BuildPart() as f7_tool134:
    # F7_s135 → F7_t136 (new body)
    with BuildSketch(Plane.YZ.offset(-76.7125659584)):
        Polygon((108.4905660377, -0.3), (120.6905660377, -12.5), (108.4905660377, -12.5), align=None)
    extrude(amount=F7_T136_DEPTH)

    split(bisect_by=Plane(origin=(-5.7166168262, 2.2866467305, 6.1569847497), x_dir=(0.3713906764, 0.9284766909, 0), z_dir=(0.6565321643, -0.2626128657, -0.7071067812)), keep=Keep.TOP)

    split(bisect_by=Plane(origin=(-13.8493522007, 5.5397408803, -14.9162088146), x_dir=(-0.3713906764, -0.9284766909, 0), z_dir=(-0.6565321643, 0.2626128657, -0.7071067812)), keep=Keep.TOP)


with BuildPart() as f1_21:
    add(f1_20.part)

    # F7_t133: cut F7_tool134
    add(f7_tool134.part, mode=Mode.SUBTRACT)


with BuildPart() as f7_tool140:
    # F7_s141 → F7_t142 (new body)
    with BuildSketch(Plane.YZ.offset(-76.7125659584)):
        Polygon((108.4905660377, -0.3), (120.6905660377, -12.5), (108.4905660377, -12.5), align=None)
    extrude(amount=F7_T142_DEPTH)

    split(bisect_by=Plane.XY.offset(-5), keep=Keep.BOTTOM)

    split(bisect_by=Plane(origin=(-5.7166168262, 2.2866467305, 6.1569847497), x_dir=(-0.3713906764, -0.9284766909, 0), z_dir=(-0.6565321643, 0.2626128657, 0.7071067812)), keep=Keep.TOP)

    split(bisect_by=Plane(origin=(-13.8493522007, 5.5397408803, -14.9162088146), x_dir=(0.3713906764, 0.9284766909, 0), z_dir=(0.6565321643, -0.2626128657, 0.7071067812)), keep=Keep.TOP)


with BuildPart() as f1_22:
    add(f1_21.part)

    # F7_t139: cut F7_tool140
    add(f7_tool140.part, mode=Mode.SUBTRACT)


with BuildPart() as f7_tool147:
    # F7_s148 → F7_t149 (new body)
    with BuildSketch(Plane.YZ.offset(-76.7125659584)):
        Polygon((108.4905660377, -0.3), (120.6905660377, -12.5), (108.4905660377, -12.5), align=None)
    extrude(amount=F7_T149_DEPTH)

    split(bisect_by=Plane.XY.offset(-5), keep=Keep.TOP)

    split(bisect_by=Plane(origin=(-5.7166168262, 2.2866467305, 6.1569847497), x_dir=(0.3713906764, 0.9284766909, 0), z_dir=(0.6565321643, -0.2626128657, -0.7071067812)), keep=Keep.TOP)


with BuildPart() as f1_23:
    add(f1_22.part)

    # F7_t146: cut F7_tool147
    add(f7_tool147.part, mode=Mode.SUBTRACT)


with BuildPart() as f7_tool153:
    # F7_s154 → F7_t155 (new body)
    with BuildSketch(Plane.YZ.offset(-76.7125659584)):
        Polygon((108.4905660377, -0.3), (120.6905660377, -12.5), (108.4905660377, -12.5), align=None)
    extrude(amount=F7_T155_DEPTH)

    split(bisect_by=Plane.XY.offset(-5), keep=Keep.BOTTOM)

    split(bisect_by=Plane(origin=(-5.7166168262, 2.2866467305, 6.1569847497), x_dir=(0.3713906764, 0.9284766909, 0), z_dir=(0.6565321643, -0.2626128657, -0.7071067812)), keep=Keep.TOP)

    split(bisect_by=Plane(origin=(-13.8493522007, 5.5397408803, -14.9162088146), x_dir=(0.3713906764, 0.9284766909, 0), z_dir=(0.6565321643, -0.2626128657, 0.7071067812)), keep=Keep.TOP)


with BuildPart() as f1_24:
    add(f1_23.part)

    # F7_t152: cut F7_tool153
    add(f7_tool153.part, mode=Mode.SUBTRACT)

    # F9 (on offset) → F10 (join)
    with BuildSketch(Plane.XY.offset(37.5)):
        Polygon((-184.6017837524, 8.1398682669), (-184.6017837524, -8.1398682669), (-130.9389472008, -29.8461858183), (-124.052836571, -12.8221913831), (-124.052836571, 12.8221913831), (-130.9389472008, 29.8461858183), align=None)
    extrude(amount=F10_DEPTH)

    # F11
    f11_edges = [f1_24.edges().sort_by_distance(p)[0] for p in [
        (-157.770365, 18.993027, 52.5),
        (-184.601784, 0, 52.5),
        (-157.770365, -18.993027, 52.5),
        (-127.495892, -21.334189, 52.5),
        (-124.052837, 0, 52.5),
        (-127.495892, 21.334189, 52.5),
    ]]
    chamfer(f11_edges, length=F11_SIZE)

    # F13 (on offset) → F14 (cut)
    with BuildSketch(Plane.XY.offset(-12.5)):
        with Locations((-1.6054697335, 0)):
            Rectangle(F13_W, F13_H)
    extrude(amount=-F14_DEPTH, mode=Mode.SUBTRACT)


solid = f1_24.part
